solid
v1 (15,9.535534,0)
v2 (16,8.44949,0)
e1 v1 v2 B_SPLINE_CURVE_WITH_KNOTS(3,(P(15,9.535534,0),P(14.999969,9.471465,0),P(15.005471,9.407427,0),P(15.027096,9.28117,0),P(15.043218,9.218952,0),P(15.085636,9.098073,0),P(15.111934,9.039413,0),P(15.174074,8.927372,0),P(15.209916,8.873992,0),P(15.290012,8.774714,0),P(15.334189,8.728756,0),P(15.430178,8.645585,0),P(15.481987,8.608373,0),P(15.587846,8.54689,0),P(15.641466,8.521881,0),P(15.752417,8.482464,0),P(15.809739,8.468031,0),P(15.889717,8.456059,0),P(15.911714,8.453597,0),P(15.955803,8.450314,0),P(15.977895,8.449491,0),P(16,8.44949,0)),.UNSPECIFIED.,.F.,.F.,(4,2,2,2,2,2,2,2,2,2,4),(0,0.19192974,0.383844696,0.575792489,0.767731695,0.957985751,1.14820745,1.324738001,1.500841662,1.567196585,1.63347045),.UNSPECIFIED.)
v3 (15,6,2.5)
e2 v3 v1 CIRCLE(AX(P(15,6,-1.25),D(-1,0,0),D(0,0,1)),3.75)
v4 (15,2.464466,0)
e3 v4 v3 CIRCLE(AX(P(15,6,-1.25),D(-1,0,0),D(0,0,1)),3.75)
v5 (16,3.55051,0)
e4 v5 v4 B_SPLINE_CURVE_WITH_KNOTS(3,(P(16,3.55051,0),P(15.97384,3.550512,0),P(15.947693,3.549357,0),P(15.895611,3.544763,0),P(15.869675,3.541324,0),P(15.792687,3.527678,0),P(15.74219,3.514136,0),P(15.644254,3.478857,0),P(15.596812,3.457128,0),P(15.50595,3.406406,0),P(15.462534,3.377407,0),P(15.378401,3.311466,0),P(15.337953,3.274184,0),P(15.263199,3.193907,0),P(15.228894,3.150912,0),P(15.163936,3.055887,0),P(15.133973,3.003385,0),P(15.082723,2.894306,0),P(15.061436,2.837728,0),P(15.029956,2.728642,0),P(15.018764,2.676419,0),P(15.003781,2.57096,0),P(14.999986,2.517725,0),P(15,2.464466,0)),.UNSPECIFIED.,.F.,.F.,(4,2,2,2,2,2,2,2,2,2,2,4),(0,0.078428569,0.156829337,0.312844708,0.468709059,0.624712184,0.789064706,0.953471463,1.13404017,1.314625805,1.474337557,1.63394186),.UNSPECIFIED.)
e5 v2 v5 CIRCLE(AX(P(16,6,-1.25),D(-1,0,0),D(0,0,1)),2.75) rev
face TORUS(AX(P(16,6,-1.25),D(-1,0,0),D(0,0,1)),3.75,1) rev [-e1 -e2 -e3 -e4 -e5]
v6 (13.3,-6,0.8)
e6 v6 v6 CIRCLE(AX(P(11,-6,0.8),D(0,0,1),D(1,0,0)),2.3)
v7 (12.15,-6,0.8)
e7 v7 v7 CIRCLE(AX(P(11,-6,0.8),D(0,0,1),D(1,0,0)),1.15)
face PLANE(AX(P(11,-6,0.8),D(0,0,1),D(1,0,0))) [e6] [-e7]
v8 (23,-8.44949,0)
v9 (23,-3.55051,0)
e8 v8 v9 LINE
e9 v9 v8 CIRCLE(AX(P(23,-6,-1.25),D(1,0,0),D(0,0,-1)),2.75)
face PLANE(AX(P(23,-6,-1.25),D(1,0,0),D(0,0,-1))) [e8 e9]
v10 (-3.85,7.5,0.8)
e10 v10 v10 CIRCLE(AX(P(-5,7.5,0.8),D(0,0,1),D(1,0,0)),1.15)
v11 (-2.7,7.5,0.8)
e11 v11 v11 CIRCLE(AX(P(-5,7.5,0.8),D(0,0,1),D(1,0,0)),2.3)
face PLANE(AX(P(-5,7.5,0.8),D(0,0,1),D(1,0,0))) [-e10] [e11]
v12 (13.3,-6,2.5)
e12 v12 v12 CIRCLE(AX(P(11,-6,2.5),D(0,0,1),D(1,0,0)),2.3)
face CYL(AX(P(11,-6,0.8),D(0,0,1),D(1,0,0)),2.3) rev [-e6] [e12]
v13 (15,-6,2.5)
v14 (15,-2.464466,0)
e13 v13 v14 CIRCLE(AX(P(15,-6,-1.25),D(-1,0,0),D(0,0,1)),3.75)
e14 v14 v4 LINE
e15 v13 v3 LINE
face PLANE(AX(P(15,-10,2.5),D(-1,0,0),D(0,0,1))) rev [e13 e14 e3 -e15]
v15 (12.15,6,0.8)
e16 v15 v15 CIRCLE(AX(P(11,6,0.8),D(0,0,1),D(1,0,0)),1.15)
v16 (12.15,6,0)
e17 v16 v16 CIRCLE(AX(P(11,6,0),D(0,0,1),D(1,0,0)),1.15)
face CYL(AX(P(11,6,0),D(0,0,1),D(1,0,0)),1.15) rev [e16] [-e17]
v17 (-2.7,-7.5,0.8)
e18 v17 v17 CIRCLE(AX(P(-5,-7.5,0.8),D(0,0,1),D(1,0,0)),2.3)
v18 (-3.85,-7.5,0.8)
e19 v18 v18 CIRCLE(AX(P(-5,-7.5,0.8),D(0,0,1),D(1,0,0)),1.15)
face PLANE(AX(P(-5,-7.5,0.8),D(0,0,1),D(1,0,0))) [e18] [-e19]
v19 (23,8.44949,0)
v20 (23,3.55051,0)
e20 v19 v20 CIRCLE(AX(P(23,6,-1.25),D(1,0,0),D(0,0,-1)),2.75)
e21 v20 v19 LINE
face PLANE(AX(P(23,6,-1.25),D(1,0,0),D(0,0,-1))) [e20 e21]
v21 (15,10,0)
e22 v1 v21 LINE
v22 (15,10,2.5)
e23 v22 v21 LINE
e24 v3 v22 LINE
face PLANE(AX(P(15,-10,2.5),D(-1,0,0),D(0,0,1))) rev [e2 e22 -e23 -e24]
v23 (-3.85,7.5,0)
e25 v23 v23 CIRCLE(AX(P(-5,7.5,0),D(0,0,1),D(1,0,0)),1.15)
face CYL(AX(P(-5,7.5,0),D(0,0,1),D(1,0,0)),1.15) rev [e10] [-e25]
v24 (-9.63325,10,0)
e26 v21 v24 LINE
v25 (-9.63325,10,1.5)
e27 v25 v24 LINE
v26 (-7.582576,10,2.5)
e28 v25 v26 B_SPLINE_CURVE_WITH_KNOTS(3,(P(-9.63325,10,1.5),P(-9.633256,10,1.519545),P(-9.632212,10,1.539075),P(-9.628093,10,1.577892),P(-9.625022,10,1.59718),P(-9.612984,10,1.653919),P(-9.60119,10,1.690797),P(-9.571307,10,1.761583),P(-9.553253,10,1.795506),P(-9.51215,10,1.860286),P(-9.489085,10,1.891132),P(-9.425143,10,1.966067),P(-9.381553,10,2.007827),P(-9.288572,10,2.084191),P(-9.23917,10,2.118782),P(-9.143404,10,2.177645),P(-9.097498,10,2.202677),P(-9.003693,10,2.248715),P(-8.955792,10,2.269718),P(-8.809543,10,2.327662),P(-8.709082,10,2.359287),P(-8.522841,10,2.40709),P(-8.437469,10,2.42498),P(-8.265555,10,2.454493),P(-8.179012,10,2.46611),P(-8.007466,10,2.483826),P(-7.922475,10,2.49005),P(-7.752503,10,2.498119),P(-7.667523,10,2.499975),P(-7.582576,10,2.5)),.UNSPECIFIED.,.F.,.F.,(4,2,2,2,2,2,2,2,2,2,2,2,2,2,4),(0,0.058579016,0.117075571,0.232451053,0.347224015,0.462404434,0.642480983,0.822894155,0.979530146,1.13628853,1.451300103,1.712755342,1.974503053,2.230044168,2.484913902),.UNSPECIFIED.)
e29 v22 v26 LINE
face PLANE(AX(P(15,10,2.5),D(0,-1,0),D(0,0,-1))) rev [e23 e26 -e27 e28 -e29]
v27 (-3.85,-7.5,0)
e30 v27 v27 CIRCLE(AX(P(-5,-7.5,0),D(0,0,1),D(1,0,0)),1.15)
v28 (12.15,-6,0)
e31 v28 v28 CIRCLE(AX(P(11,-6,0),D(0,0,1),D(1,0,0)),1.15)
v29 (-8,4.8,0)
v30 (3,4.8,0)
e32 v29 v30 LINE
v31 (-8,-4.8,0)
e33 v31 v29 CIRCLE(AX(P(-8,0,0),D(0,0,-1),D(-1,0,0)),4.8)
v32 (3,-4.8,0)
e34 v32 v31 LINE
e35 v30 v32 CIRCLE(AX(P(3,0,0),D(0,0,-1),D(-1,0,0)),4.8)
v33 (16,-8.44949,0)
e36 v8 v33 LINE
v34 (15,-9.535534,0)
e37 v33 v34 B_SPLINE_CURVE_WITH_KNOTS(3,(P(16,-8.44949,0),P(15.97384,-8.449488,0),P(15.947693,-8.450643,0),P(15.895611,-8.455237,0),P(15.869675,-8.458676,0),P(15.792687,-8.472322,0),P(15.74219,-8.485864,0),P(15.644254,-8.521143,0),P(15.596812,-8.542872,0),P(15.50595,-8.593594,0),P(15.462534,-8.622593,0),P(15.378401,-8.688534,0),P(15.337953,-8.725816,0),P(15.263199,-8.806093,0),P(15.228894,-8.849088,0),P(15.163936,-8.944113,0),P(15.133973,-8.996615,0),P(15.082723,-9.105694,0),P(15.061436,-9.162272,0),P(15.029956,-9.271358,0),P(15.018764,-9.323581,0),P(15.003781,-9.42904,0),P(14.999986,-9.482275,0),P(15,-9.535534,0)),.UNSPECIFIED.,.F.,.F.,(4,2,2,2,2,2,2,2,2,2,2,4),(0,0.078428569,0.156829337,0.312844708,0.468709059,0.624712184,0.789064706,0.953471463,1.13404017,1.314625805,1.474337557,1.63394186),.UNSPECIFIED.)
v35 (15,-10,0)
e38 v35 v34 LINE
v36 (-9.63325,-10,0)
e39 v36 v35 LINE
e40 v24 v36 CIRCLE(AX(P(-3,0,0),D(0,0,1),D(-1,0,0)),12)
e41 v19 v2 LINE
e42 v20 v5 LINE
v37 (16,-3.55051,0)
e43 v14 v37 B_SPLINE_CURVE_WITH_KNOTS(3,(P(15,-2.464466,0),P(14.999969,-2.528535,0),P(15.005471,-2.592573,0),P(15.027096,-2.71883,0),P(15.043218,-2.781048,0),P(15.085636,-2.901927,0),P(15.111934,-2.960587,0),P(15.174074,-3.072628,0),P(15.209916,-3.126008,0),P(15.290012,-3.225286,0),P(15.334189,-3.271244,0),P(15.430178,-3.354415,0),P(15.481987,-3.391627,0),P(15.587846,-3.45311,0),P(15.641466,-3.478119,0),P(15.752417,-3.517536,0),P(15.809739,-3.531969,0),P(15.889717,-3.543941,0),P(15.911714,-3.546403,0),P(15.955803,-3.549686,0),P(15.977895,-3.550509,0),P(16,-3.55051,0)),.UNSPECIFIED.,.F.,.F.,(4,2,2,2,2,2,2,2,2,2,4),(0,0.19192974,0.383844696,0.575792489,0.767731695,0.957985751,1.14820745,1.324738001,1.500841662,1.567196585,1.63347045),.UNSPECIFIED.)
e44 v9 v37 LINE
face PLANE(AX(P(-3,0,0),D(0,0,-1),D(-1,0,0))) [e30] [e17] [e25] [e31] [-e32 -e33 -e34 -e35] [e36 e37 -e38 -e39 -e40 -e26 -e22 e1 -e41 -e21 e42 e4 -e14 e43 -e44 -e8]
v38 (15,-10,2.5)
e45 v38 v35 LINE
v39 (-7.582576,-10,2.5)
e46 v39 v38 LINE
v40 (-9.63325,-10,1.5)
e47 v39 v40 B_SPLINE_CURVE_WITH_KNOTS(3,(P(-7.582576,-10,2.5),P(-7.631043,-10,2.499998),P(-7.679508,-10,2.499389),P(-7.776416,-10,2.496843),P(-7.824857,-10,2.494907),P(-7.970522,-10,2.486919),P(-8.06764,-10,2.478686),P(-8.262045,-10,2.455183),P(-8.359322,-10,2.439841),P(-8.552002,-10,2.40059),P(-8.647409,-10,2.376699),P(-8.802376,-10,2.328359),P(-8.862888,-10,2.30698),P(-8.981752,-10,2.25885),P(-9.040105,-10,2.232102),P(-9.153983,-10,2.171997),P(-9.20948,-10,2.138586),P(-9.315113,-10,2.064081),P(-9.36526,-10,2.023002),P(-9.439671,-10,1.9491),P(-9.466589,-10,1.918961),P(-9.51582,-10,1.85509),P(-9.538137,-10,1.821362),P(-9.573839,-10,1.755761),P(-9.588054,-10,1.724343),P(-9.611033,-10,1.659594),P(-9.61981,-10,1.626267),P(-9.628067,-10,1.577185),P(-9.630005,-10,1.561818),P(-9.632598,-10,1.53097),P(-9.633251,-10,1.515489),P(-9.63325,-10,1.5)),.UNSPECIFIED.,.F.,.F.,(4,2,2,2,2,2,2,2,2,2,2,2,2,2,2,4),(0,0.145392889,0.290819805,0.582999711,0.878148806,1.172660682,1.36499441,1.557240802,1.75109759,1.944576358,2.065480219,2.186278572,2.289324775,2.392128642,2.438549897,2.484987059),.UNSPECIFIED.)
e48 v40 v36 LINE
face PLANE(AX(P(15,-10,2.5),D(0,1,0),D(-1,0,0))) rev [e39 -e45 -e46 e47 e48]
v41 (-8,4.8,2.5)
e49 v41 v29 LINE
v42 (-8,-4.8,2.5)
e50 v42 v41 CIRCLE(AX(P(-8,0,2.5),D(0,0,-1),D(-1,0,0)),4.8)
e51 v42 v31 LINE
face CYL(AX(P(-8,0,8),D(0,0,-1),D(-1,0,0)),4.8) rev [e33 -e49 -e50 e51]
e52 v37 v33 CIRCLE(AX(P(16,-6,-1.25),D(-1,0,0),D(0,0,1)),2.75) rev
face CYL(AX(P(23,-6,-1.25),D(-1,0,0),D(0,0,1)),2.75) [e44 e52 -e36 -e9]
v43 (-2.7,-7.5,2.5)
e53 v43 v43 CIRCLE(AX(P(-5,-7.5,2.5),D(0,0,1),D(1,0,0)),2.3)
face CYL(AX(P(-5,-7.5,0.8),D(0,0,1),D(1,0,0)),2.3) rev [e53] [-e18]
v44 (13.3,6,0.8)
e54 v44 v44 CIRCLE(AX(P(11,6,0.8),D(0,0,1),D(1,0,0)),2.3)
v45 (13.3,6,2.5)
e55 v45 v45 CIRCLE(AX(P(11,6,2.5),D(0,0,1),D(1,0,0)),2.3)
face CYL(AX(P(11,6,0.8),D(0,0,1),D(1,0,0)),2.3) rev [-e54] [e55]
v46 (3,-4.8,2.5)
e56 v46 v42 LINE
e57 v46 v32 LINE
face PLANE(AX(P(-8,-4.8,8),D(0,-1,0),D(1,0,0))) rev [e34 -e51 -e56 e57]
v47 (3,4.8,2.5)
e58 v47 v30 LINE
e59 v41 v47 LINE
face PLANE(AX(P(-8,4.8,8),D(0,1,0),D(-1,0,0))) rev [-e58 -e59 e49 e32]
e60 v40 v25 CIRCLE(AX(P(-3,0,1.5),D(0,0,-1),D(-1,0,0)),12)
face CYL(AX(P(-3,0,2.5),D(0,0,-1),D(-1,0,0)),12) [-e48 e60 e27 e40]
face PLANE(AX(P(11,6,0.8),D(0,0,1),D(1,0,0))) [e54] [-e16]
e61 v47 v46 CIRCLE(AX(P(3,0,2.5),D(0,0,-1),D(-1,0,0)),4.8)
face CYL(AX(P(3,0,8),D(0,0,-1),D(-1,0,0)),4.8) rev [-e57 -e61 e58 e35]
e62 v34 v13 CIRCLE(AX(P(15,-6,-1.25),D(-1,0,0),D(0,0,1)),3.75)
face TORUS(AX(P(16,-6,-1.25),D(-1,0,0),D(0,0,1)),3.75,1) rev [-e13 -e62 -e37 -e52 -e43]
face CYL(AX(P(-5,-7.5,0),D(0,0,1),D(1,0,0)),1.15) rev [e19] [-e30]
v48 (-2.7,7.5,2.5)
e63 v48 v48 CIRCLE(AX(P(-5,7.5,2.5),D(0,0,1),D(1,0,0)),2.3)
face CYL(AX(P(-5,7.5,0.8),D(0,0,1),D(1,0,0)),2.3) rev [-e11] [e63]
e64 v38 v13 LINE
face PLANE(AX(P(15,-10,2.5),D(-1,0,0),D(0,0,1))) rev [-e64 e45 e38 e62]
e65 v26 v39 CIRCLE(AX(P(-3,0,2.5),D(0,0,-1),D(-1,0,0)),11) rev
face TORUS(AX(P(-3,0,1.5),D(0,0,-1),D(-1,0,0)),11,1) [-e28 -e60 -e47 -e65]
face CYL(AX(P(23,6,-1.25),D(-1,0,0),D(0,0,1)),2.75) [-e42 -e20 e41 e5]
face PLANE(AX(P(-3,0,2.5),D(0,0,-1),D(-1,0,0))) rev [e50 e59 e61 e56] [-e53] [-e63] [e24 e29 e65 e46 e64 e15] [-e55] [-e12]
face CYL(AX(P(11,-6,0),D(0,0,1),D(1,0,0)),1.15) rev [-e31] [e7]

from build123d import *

# Parameters (mm, degrees)
BOSS_EXTRUDE1_DEPTH = 2.5
BOSS_EXTRUDE2_DEPTH = 8
FILLET2_R           = 1
CUT_EXTRUDE1_DEPTH  = 8
SKETCH4_R           = 2.3
CUT_EXTRUDE2_DEPTH  = 1.7
SKETCH5_R           = 1.15
CUT_EXTRUDE3_DEPTH  = 26.137422433
FILLET3_R           = 1


with BuildPart() as part:
    # Sketch1 → Boss-Extrude1 (new body)
    with BuildSketch(Plane.XY):
        with BuildLine():
            Line((15, -10), (-9.633249581, -10))
            ThreePointArc((-9.633249581, -10), (-15, 0), (-9.633249581, 10))
            Line((-9.633249581, 10), (15, 10))
            Line((15, 10), (15, -10))
        make_face()
    extrude(amount=BOSS_EXTRUDE1_DEPTH)

    # Sketch2 → Boss-Extrude2 (add)
    with BuildSketch(Plane(origin=(15, 0, 0), x_dir=(0, 0, -1), z_dir=(1, 0, 0))):
        with BuildLine():
            Line((0, -8.449489743), (0, -3.550510257))
            ThreePointArc((0, -3.550510257), (-1.5, -6), (0, -8.449489743))
        make_face()
        with BuildLine():
            Line((0, 3.550510257), (0, 8.449489743))
            ThreePointArc((0, 8.449489743), (-1.5, 6), (0, 3.550510257))
        make_face()
    extrude(amount=BOSS_EXTRUDE2_DEPTH)

    # Fillet2
    fillet2_edges = [part.edges().sort_by_distance(p)[0] for p in [
        (15, -6, 1.5),
        (15, 6, 1.5),
    ]]
    fillet(fillet2_edges, radius=FILLET2_R - 0.0001)  # a hair under: the kernel refuses the full size

    # Sketch3 → Cut-Extrude1 (cut)
    with BuildSketch(Plane(origin=(0, 0, 0), x_dir=(-1, 0, 0), z_dir=(0, 0, -1))):
        with BuildLine():
            Line((8, -4.8), (-3, -4.8))
            ThreePointArc((-3, -4.8), (-7.8, 0), (-3, 4.8))
            Line((-3, 4.8), (8, 4.8))
            ThreePointArc((8, 4.8), (12.8, 0), (8, -4.8))
        make_face()
    extrude(amount=-CUT_EXTRUDE1_DEPTH, mode=Mode.SUBTRACT)

    # Sketch4 → Cut-Extrude2 (cut)
    with BuildSketch(Plane.XY.offset(2.5)):
        with Locations((-5, 7.5)):
            Circle(SKETCH4_R)
        with Locations((11, 6)):
            Circle(SKETCH4_R)
        with Locations((11, -6)):
            Circle(SKETCH4_R)
        with Locations((-5, -7.5)):
            Circle(SKETCH4_R)
    extrude(amount=-CUT_EXTRUDE2_DEPTH, mode=Mode.SUBTRACT)

    # Sketch5 → Cut-Extrude3 (cut, through all)
    with BuildSketch(Plane.XY.offset(0.8)):
        with Locations((-5, 7.5)):
            Circle(SKETCH5_R)
        with Locations((11, 6)):
            Circle(SKETCH5_R)
        with Locations((11, -6)):
            Circle(SKETCH5_R)
        with Locations((-5, -7.5)):
            Circle(SKETCH5_R)
    extrude(amount=-CUT_EXTRUDE3_DEPTH, mode=Mode.SUBTRACT)

    # Fillet3
    fillet3_edges = [part.edges().sort_by_distance(p)[0] for p in [
        (-15, 0, 2.5),
    ]]
    fillet(fillet3_edges, radius=FILLET3_R)


solid = part.part
